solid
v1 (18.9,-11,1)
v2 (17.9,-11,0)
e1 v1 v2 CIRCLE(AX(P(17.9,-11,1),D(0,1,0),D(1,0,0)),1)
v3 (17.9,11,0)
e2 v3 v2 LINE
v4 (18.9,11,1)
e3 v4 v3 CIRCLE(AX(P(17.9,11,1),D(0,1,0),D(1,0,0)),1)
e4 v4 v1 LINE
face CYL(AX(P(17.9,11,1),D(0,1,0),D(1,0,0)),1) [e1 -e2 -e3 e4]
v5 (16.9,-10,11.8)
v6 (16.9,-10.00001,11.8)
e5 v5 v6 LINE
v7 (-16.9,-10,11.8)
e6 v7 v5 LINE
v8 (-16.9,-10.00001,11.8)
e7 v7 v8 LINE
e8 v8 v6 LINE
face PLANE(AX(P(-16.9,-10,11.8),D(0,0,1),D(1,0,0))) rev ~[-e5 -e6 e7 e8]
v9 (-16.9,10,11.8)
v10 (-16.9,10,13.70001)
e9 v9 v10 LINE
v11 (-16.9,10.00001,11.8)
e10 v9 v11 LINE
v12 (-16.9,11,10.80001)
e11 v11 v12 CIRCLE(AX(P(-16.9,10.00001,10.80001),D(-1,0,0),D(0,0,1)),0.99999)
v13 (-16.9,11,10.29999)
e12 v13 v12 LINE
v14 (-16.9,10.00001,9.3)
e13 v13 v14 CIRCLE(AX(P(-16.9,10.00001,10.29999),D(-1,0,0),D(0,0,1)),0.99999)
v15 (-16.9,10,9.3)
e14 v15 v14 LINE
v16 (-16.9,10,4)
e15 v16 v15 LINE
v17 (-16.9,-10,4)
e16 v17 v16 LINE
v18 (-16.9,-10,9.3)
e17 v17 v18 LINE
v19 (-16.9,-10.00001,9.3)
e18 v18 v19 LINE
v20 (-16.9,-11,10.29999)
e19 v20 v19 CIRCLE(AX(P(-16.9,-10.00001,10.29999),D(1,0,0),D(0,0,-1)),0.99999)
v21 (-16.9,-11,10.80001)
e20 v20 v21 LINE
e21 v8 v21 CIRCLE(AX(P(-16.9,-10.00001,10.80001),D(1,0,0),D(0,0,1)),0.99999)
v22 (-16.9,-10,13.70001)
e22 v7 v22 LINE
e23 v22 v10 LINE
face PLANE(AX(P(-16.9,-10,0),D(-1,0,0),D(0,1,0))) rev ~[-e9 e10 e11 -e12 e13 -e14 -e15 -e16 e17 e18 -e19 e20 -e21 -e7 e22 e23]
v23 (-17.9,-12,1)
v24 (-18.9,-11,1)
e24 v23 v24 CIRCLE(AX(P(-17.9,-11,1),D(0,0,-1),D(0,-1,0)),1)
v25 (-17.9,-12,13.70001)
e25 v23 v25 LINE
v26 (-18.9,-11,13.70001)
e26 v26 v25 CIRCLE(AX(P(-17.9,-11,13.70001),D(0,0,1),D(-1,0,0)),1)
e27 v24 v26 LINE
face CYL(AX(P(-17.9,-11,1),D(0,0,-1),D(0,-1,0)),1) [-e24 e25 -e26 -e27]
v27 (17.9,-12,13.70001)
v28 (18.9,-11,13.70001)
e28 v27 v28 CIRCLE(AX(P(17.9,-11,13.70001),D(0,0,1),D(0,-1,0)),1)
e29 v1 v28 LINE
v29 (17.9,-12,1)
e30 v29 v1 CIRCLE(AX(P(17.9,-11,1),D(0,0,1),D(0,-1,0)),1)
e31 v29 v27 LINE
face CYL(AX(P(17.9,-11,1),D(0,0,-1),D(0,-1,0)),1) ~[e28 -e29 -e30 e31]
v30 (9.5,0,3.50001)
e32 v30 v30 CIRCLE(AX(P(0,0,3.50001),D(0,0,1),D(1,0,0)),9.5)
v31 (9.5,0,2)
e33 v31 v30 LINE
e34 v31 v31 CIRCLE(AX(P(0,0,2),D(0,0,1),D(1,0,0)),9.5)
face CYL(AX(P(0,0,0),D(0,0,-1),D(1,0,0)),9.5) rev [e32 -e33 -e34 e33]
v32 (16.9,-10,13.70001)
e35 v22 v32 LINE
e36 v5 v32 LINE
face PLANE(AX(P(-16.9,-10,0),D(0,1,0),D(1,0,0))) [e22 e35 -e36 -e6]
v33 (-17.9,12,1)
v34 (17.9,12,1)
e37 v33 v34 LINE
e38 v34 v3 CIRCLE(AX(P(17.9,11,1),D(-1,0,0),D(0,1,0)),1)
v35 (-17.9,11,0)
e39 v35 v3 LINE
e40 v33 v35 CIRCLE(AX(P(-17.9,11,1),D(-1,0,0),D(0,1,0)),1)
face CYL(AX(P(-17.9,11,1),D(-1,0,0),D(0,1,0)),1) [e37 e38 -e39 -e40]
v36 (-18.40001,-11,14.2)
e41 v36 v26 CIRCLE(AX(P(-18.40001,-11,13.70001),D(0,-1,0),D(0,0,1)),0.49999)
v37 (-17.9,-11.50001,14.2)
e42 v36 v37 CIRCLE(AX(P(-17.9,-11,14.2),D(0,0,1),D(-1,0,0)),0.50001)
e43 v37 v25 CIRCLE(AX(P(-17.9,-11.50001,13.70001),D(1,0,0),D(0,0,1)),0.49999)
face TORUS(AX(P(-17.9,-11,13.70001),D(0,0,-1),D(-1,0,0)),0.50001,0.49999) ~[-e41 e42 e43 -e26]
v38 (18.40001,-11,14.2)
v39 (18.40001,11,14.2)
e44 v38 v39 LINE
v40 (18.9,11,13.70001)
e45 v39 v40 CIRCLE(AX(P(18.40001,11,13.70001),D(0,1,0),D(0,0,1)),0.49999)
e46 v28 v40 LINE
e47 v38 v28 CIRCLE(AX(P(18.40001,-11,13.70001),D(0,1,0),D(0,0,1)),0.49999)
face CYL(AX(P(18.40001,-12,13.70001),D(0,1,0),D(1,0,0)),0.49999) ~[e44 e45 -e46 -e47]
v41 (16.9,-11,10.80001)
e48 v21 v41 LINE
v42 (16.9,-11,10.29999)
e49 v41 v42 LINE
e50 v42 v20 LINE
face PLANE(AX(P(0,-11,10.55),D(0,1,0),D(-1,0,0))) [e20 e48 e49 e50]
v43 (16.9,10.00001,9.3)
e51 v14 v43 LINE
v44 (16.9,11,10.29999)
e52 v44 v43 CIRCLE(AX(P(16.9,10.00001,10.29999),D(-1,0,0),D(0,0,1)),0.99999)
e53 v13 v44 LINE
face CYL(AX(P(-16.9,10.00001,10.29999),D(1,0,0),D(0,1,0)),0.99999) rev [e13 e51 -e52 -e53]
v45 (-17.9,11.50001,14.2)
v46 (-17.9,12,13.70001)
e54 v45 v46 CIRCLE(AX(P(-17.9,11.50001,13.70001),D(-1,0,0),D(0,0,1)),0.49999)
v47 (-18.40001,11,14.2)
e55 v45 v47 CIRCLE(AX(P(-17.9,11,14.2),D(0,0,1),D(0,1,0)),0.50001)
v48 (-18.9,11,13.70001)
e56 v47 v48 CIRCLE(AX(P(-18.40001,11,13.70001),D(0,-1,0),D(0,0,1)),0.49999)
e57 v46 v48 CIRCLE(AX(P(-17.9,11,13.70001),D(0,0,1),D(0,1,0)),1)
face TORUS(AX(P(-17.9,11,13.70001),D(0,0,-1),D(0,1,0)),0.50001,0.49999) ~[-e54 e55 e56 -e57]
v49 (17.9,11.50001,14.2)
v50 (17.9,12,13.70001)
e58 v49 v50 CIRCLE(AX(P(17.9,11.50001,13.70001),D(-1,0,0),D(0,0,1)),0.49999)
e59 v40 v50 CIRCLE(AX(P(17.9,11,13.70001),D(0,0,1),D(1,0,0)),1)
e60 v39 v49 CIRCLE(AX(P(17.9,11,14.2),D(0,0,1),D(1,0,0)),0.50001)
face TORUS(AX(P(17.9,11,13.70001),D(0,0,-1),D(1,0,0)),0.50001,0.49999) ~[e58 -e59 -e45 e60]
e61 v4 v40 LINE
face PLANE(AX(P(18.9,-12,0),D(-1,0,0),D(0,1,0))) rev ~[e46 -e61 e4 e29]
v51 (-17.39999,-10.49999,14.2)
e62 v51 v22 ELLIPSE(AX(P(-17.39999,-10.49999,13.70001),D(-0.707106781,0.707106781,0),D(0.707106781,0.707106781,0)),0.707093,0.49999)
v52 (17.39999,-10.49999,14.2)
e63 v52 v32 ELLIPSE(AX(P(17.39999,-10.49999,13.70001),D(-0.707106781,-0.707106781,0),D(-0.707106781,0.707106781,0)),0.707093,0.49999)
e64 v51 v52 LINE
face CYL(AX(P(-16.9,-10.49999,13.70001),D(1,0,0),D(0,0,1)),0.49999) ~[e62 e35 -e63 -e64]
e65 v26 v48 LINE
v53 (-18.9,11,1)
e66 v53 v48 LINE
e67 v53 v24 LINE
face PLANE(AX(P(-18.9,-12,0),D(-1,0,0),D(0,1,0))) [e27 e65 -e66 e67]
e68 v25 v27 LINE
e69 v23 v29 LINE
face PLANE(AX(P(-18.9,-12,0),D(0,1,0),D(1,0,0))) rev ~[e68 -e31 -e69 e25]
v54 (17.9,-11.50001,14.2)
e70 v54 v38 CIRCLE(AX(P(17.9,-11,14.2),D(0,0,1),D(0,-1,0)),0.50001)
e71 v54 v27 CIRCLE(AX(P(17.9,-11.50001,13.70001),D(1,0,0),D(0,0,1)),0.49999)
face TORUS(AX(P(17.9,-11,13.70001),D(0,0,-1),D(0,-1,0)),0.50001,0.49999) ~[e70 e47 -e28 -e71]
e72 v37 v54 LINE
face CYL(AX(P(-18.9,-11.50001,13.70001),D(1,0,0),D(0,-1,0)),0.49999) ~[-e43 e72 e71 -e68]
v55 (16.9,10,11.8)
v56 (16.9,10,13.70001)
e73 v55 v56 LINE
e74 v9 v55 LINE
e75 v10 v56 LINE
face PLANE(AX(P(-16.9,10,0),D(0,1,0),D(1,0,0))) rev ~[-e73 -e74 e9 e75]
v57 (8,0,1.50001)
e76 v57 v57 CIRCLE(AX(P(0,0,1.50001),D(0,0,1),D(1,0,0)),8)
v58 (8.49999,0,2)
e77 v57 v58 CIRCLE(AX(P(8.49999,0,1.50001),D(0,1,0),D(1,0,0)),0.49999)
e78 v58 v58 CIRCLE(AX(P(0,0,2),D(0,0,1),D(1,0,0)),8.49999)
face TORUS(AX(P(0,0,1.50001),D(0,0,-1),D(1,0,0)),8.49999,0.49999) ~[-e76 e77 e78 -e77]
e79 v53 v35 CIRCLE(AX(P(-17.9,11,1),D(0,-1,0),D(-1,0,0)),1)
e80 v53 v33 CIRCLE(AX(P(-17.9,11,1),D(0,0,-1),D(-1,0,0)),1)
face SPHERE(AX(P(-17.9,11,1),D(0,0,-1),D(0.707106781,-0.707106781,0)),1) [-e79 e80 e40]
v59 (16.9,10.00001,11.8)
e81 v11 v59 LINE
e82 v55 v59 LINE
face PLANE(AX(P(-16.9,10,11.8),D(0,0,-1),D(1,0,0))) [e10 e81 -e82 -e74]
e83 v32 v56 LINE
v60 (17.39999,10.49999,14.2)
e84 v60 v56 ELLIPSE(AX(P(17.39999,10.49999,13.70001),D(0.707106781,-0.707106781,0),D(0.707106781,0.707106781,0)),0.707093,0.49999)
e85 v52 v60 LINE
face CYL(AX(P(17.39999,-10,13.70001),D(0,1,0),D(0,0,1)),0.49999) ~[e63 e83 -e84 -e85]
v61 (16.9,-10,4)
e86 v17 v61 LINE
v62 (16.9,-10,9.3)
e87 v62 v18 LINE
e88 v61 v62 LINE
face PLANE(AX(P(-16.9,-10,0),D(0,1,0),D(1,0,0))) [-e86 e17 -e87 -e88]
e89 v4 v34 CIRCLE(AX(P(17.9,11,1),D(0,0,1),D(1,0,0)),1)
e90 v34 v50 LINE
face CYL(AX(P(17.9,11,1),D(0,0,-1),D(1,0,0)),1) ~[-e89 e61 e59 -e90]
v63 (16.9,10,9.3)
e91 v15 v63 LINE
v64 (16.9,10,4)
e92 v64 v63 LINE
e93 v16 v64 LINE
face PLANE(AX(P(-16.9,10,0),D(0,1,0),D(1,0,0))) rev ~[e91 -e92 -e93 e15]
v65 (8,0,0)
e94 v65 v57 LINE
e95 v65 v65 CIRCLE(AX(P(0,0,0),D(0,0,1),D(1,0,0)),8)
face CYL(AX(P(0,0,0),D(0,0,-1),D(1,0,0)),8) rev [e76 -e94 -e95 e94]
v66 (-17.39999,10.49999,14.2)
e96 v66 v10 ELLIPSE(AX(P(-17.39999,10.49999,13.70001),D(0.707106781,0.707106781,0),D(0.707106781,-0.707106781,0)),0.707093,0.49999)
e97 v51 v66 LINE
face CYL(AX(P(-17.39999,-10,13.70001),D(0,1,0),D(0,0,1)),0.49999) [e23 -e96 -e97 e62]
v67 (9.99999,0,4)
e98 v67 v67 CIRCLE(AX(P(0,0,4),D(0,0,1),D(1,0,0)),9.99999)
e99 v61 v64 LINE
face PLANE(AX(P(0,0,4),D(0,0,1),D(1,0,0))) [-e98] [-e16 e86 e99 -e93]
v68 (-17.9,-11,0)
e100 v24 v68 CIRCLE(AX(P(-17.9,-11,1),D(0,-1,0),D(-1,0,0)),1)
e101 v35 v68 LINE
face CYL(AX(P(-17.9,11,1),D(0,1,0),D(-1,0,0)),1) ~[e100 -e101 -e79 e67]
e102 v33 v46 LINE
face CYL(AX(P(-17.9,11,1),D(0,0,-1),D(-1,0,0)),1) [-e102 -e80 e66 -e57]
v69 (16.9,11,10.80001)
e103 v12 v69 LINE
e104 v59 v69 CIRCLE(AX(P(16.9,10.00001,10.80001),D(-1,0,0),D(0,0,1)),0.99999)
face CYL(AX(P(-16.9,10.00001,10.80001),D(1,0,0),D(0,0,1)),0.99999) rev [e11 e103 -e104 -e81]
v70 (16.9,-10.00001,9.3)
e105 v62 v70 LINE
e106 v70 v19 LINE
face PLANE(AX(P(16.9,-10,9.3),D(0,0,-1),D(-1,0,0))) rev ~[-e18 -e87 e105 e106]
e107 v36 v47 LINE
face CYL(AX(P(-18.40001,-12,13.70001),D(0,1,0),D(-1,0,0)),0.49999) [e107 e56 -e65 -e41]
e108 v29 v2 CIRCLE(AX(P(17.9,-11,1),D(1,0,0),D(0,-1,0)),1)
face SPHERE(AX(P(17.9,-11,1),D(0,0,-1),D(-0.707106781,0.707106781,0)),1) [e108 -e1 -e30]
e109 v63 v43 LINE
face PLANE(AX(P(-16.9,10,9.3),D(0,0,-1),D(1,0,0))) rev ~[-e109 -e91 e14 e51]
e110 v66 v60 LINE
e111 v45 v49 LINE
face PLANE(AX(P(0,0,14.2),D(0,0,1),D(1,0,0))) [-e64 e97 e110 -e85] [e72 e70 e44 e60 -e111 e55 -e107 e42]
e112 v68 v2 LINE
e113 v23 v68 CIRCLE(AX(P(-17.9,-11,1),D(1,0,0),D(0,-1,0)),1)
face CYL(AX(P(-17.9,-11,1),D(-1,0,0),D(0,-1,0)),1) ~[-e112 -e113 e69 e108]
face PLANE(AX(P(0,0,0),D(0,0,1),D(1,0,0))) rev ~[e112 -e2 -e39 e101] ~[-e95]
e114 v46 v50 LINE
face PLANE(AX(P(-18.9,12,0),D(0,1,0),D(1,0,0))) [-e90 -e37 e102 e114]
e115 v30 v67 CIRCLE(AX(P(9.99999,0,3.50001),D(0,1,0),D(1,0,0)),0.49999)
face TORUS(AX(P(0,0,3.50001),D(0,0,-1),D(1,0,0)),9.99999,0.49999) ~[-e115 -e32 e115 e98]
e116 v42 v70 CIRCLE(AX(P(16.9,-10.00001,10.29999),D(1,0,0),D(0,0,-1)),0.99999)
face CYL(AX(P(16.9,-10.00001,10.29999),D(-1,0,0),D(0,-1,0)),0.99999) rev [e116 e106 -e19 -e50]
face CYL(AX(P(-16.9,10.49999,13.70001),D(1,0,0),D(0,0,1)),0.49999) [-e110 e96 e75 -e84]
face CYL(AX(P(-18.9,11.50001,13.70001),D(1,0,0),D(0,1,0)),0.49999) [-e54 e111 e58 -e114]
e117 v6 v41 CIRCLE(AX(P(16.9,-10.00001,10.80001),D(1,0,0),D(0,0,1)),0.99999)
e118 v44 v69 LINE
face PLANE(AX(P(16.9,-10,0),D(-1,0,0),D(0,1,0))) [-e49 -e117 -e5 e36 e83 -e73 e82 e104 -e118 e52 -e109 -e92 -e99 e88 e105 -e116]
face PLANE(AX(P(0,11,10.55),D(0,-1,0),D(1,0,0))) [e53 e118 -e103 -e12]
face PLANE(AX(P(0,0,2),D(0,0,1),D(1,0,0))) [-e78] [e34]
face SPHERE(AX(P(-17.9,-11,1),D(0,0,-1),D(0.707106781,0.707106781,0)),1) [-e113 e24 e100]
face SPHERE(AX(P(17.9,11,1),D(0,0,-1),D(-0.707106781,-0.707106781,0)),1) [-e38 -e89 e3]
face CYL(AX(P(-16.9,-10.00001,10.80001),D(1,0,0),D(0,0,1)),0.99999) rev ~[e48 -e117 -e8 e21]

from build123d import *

# Parameters (mm, degrees)
F0_W          = 37.8
F0_H          = 24
F0_W_2        = 33.8
F0_H_2        = 20
F1_DEPTH      = 14.2
F0_R          = 9.5
F2_DEPTH      = 4
F0_R_2        = 8
F3_DEPTH      = 2
F4_W          = 33.8
F4_H          = 2.5
F5_DEPTH      = 1
F7_DEPTH      = 1
F8_R          = 0.49999
F9_R          = 0.99999
F10_T1_DEPTH  = 35.8
F10_T3_DEPTH  = 22
F10_T5_DEPTH  = 13.2
F10_T8_ANGLE  = 90
F10_T10_ANGLE = 90
F10_T12_ANGLE = 90
F10_T14_ANGLE = 90
F10_S17_W     = 1
F10_S17_H     = 1
F10_T18_DEPTH = 1
F10_S23_W     = 1
F10_S23_H     = 1
F10_T24_DEPTH = 1
F10_S29_W     = 1
F10_S29_H     = 1
F10_T30_DEPTH = 1
F10_S35_W     = 1
F10_S35_H     = 1
F10_T36_DEPTH = 1


# Not quite as in the source:
# - a fillet or chamfer that OpenCascade refuses, or shapes differently, is made with other operations: its cross-section is extruded or revolved along the edge and cut away or added
# - a fillet or chamfer is up to 0.001 mm smaller than in the source, because OpenCascade refuses the exact size


with BuildPart() as f1:
    # F0 (on Top) → F1 (new body)
    with BuildSketch(Plane.XY):
        Rectangle(F0_W, F0_H)
        Rectangle(F0_W_2, F0_H_2, mode=Mode.SUBTRACT)
    extrude(amount=F1_DEPTH)

    # F0 (on Top) → F2 (join)
    with BuildSketch(Plane.XY):
        Rectangle(F0_W_2, F0_H_2)
        Circle(F0_R, mode=Mode.SUBTRACT)
    extrude(amount=F2_DEPTH)

    # F0 (on Top) → F3 (join)
    with BuildSketch(Plane.XY):
        Circle(F0_R)
        Circle(F0_R_2, mode=Mode.SUBTRACT)
    extrude(amount=F3_DEPTH)

    # F4 (on face) → F5 (cut)
    with BuildSketch(Plane.XZ.offset(-10)):
        with Locations((0, 10.55)):
            Rectangle(F4_W, F4_H)
    extrude(amount=-F5_DEPTH, mode=Mode.SUBTRACT)

    # F6 (on face) → F7 (cut)
    with BuildSketch(Plane(origin=(0, -10, 0), x_dir=(-1, 0, 0), z_dir=(0, 1, 0))):
        Polygon((-16.9, 9.3), (1.5624057269, 9.3), (16.9, 9.3), (16.9, 11.8), (-16.9, 11.8), align=None)
    extrude(amount=-F7_DEPTH, mode=Mode.SUBTRACT)

    # F8 (radius 0.5 in the source; OpenCascade refuses exactly that, so slightly less here)
    f8_edges = [f1.edges().sort_by_distance(p)[0] for p in [
        (-9.5, 0, 4),
        (-8, 0, 2),
        (0, 10, 14.2),
        (16.9, 0, 14.2),
        (-16.9, 0, 14.2),
        (0, -10, 14.2),
        (0, -12, 14.2),
        (18.9, 0, 14.2),
        (0, 12, 14.2),
        (-18.9, 0, 14.2),
    ]]
    fillet(f8_edges, radius=F8_R)

    # F9 (radius 1 in the source; OpenCascade refuses exactly that, so slightly less here)
    f9_edges = [f1.edges().sort_by_distance(p)[0] for p in [
        (0, 11, 9.3),
        (0, 11, 11.8),
        (0, -11, 9.3),
        (0, -11, 11.8),
    ]]
    fillet(f9_edges, radius=F9_R)

    # F10: fillet of radius 1 on 8 edges, made by hand

    # F10_s2 → F10_t1 (cut)
    with BuildSketch(Plane.YZ.offset(-17.9)):
        with BuildLine():
            ThreePointArc((-12, 1), (-11.7071067812, 0.2928932188), (-11, 0))
            Line((-11, 0), (-12, 0))
            Line((-12, 0), (-12, 1))
        make_face()
        with BuildLine():
            ThreePointArc((12, 1), (11.7071067812, 0.2928932188), (11, 0))
            Line((11, 0), (12, 0))
            Line((12, 0), (12, 1))
        make_face()
    extrude(amount=F10_T1_DEPTH, mode=Mode.SUBTRACT)

    # F10_s4 → F10_t3 (cut)
    with BuildSketch(Plane.XZ.offset(-11)):
        with BuildLine():
            ThreePointArc((-18.9, 1), (-18.6071067812, 0.2928932188), (-17.9, 0))
            Line((-17.9, 0), (-18.9, 0))
            Line((-18.9, 0), (-18.9, 1))
        make_face()
        with BuildLine():
            ThreePointArc((18.9, 1), (18.6071067812, 0.2928932188), (17.9, 0))
            Line((17.9, 0), (18.9, 0))
            Line((18.9, 0), (18.9, 1))
        make_face()
    extrude(amount=F10_T3_DEPTH, mode=Mode.SUBTRACT)

    # F10_s6 → F10_t5 (cut)
    with BuildSketch(Plane.XY.offset(1)):
        with BuildLine():
            ThreePointArc((17.9, -12), (18.6071067812, -11.7071067812), (18.9, -11))
            Line((18.9, -11), (18.9, -12))
            Line((18.9, -12), (17.9, -12))
        make_face()
        with BuildLine():
            ThreePointArc((-17.9, -12), (-18.6071067812, -11.7071067812), (-18.9, -11))
            Line((-18.9, -11), (-18.9, -12))
            Line((-18.9, -12), (-17.9, -12))
        make_face()
        with BuildLine():
            ThreePointArc((18.9, 11), (18.6071067812, 11.7071067812), (17.9, 12))
            Line((17.9, 12), (18.9, 12))
            Line((18.9, 12), (18.9, 11))
        make_face()
        with BuildLine():
            ThreePointArc((-18.9, 11), (-18.6071067812, 11.7071067812), (-17.9, 12))
            Line((-17.9, 12), (-18.9, 12))
            Line((-18.9, 12), (-18.9, 11))
        make_face()
    extrude(amount=F10_T5_DEPTH, mode=Mode.SUBTRACT)

    # F10_s7 → F10_t8 (revolve, cut)
    with BuildSketch(Plane.YZ.offset(-17.9)):
        with BuildLine():
            ThreePointArc((11.50001, 14.2), (11.8535563195, 14.0535563195), (12, 13.70001))
            Line((12, 13.70001), (12, 14.2))
            Line((12, 14.2), (11.50001, 14.2))
        make_face()
    revolve(axis=Axis((-17.9, 11, 14.2), (0, 0, 1)), revolution_arc=F10_T8_ANGLE, mode=Mode.SUBTRACT)

    # F10_s9 → F10_t10 (revolve, cut)
    with BuildSketch(Plane.XZ.offset(-11)):
        with BuildLine():
            ThreePointArc((18.40001, 14.2), (18.7535563195, 14.0535563195), (18.9, 13.70001))
            Line((18.9, 13.70001), (18.9, 14.2))
            Line((18.9, 14.2), (18.40001, 14.2))
        make_face()
    revolve(axis=Axis((17.9, 11, 14.2), (0, 0, 1)), revolution_arc=F10_T10_ANGLE, mode=Mode.SUBTRACT)

    # F10_s11 → F10_t12 (revolve, cut)
    with BuildSketch(Plane.XZ.offset(11)):
        with BuildLine():
            ThreePointArc((-18.40001, 14.2), (-18.7535563195, 14.0535563195), (-18.9, 13.70001))
            Line((-18.9, 13.70001), (-18.9, 14.2))
            Line((-18.9, 14.2), (-18.40001, 14.2))
        make_face()
    revolve(axis=Axis((-17.9, -11, 14.2), (0, 0, 1)), revolution_arc=F10_T12_ANGLE, mode=Mode.SUBTRACT)

    # F10_s13 → F10_t14 (revolve, cut)
    with BuildSketch(Plane.YZ.offset(17.9)):
        with BuildLine():
            ThreePointArc((-11.50001, 14.2), (-11.8535563195, 14.0535563195), (-12, 13.70001))
            Line((-12, 13.70001), (-12, 14.2))
            Line((-12, 14.2), (-11.50001, 14.2))
        make_face()
    revolve(axis=Axis((17.9, -11, 14.2), (0, 0, 1)), revolution_arc=F10_T14_ANGLE, mode=Mode.SUBTRACT)


with BuildPart() as f10_tool16:
    # F10_s17 → F10_t18 (new body)
    with BuildSketch(Plane.XY.offset(1)):
        with Locations((-18.4, -11.5)):
            Rectangle(F10_S17_W, F10_S17_H)
    extrude(amount=-F10_T18_DEPTH)

    # F10_s19 → F10_t20 (revolve, cut)
    with BuildSketch(Plane(origin=(-17.9, -11, 1), x_dir=(0.7071067812, 0.7071067812, 0), z_dir=(-0.7071067812, 0.7071067812, 0))):
        with BuildLine():
            ThreePointArc((0, -1), (1, 0), (0, 1))
            Line((0, 1), (0, -1))
        make_face()
    revolve(axis=Axis((-17.9, -11, 1), (0, 0, -1)), mode=Mode.SUBTRACT)


with BuildPart() as f1_1:
    add(f1.part)

    # F10_t15: cut F10_tool16
    add(f10_tool16.part, mode=Mode.SUBTRACT)


with BuildPart() as f10_tool22:
    # F10_s23 → F10_t24 (new body)
    with BuildSketch(Plane.XY.offset(1)):
        with Locations((18.4, -11.5)):
            Rectangle(F10_S23_W, F10_S23_H)
    extrude(amount=-F10_T24_DEPTH)

    # F10_s25 → F10_t26 (revolve, cut)
    with BuildSketch(Plane(origin=(17.9, -11, 1), x_dir=(-0.7071067812, 0.7071067812, 0), z_dir=(-0.7071067812, -0.7071067812, 0))):
        with BuildLine():
            ThreePointArc((0, -1), (1, 0), (0, 1))
            Line((0, 1), (0, -1))
        make_face()
    revolve(axis=Axis((17.9, -11, 1), (0, 0, -1)), mode=Mode.SUBTRACT)


with BuildPart() as f1_2:
    add(f1_1.part)

    # F10_t21: cut F10_tool22
    add(f10_tool22.part, mode=Mode.SUBTRACT)


with BuildPart() as f10_tool28:
    # F10_s29 → F10_t30 (new body)
    with BuildSketch(Plane.XY.offset(1)):
        with Locations((-18.4, 11.5)):
            Rectangle(F10_S29_W, F10_S29_H)
    extrude(amount=-F10_T30_DEPTH)

    # F10_s31 → F10_t32 (revolve, cut)
    with BuildSketch(Plane(origin=(-17.9, 11, 1), x_dir=(0.7071067812, -0.7071067812, 0), z_dir=(0.7071067812, 0.7071067812, 0))):
        with BuildLine():
            ThreePointArc((0, -1), (1, 0), (0, 1))
            Line((0, 1), (0, -1))
        make_face()
    revolve(axis=Axis((-17.9, 11, 1), (0, 0, -1)), mode=Mode.SUBTRACT)


with BuildPart() as f1_3:
    add(f1_2.part)

    # F10_t27: cut F10_tool28
    add(f10_tool28.part, mode=Mode.SUBTRACT)


with BuildPart() as f10_tool34:
    # F10_s35 → F10_t36 (new body)
    with BuildSketch(Plane.XY.offset(1)):
        with Locations((18.4, 11.5)):
            Rectangle(F10_S35_W, F10_S35_H)
    extrude(amount=-F10_T36_DEPTH)

    # F10_s37 → F10_t38 (revolve, cut)
    with BuildSketch(Plane(origin=(17.9, 11, 1), x_dir=(-0.7071067812, -0.7071067812, 0), z_dir=(0.7071067812, -0.7071067812, 0))):
        with BuildLine():
            ThreePointArc((0, -1), (1, 0), (0, 1))
            Line((0, 1), (0, -1))
        make_face()
    revolve(axis=Axis((17.9, 11, 1), (0, 0, -1)), mode=Mode.SUBTRACT)


with BuildPart() as f1_4:
    add(f1_3.part)

    # F10_t33: cut F10_tool34
    add(f10_tool34.part, mode=Mode.SUBTRACT)


solid = f1_4.part
